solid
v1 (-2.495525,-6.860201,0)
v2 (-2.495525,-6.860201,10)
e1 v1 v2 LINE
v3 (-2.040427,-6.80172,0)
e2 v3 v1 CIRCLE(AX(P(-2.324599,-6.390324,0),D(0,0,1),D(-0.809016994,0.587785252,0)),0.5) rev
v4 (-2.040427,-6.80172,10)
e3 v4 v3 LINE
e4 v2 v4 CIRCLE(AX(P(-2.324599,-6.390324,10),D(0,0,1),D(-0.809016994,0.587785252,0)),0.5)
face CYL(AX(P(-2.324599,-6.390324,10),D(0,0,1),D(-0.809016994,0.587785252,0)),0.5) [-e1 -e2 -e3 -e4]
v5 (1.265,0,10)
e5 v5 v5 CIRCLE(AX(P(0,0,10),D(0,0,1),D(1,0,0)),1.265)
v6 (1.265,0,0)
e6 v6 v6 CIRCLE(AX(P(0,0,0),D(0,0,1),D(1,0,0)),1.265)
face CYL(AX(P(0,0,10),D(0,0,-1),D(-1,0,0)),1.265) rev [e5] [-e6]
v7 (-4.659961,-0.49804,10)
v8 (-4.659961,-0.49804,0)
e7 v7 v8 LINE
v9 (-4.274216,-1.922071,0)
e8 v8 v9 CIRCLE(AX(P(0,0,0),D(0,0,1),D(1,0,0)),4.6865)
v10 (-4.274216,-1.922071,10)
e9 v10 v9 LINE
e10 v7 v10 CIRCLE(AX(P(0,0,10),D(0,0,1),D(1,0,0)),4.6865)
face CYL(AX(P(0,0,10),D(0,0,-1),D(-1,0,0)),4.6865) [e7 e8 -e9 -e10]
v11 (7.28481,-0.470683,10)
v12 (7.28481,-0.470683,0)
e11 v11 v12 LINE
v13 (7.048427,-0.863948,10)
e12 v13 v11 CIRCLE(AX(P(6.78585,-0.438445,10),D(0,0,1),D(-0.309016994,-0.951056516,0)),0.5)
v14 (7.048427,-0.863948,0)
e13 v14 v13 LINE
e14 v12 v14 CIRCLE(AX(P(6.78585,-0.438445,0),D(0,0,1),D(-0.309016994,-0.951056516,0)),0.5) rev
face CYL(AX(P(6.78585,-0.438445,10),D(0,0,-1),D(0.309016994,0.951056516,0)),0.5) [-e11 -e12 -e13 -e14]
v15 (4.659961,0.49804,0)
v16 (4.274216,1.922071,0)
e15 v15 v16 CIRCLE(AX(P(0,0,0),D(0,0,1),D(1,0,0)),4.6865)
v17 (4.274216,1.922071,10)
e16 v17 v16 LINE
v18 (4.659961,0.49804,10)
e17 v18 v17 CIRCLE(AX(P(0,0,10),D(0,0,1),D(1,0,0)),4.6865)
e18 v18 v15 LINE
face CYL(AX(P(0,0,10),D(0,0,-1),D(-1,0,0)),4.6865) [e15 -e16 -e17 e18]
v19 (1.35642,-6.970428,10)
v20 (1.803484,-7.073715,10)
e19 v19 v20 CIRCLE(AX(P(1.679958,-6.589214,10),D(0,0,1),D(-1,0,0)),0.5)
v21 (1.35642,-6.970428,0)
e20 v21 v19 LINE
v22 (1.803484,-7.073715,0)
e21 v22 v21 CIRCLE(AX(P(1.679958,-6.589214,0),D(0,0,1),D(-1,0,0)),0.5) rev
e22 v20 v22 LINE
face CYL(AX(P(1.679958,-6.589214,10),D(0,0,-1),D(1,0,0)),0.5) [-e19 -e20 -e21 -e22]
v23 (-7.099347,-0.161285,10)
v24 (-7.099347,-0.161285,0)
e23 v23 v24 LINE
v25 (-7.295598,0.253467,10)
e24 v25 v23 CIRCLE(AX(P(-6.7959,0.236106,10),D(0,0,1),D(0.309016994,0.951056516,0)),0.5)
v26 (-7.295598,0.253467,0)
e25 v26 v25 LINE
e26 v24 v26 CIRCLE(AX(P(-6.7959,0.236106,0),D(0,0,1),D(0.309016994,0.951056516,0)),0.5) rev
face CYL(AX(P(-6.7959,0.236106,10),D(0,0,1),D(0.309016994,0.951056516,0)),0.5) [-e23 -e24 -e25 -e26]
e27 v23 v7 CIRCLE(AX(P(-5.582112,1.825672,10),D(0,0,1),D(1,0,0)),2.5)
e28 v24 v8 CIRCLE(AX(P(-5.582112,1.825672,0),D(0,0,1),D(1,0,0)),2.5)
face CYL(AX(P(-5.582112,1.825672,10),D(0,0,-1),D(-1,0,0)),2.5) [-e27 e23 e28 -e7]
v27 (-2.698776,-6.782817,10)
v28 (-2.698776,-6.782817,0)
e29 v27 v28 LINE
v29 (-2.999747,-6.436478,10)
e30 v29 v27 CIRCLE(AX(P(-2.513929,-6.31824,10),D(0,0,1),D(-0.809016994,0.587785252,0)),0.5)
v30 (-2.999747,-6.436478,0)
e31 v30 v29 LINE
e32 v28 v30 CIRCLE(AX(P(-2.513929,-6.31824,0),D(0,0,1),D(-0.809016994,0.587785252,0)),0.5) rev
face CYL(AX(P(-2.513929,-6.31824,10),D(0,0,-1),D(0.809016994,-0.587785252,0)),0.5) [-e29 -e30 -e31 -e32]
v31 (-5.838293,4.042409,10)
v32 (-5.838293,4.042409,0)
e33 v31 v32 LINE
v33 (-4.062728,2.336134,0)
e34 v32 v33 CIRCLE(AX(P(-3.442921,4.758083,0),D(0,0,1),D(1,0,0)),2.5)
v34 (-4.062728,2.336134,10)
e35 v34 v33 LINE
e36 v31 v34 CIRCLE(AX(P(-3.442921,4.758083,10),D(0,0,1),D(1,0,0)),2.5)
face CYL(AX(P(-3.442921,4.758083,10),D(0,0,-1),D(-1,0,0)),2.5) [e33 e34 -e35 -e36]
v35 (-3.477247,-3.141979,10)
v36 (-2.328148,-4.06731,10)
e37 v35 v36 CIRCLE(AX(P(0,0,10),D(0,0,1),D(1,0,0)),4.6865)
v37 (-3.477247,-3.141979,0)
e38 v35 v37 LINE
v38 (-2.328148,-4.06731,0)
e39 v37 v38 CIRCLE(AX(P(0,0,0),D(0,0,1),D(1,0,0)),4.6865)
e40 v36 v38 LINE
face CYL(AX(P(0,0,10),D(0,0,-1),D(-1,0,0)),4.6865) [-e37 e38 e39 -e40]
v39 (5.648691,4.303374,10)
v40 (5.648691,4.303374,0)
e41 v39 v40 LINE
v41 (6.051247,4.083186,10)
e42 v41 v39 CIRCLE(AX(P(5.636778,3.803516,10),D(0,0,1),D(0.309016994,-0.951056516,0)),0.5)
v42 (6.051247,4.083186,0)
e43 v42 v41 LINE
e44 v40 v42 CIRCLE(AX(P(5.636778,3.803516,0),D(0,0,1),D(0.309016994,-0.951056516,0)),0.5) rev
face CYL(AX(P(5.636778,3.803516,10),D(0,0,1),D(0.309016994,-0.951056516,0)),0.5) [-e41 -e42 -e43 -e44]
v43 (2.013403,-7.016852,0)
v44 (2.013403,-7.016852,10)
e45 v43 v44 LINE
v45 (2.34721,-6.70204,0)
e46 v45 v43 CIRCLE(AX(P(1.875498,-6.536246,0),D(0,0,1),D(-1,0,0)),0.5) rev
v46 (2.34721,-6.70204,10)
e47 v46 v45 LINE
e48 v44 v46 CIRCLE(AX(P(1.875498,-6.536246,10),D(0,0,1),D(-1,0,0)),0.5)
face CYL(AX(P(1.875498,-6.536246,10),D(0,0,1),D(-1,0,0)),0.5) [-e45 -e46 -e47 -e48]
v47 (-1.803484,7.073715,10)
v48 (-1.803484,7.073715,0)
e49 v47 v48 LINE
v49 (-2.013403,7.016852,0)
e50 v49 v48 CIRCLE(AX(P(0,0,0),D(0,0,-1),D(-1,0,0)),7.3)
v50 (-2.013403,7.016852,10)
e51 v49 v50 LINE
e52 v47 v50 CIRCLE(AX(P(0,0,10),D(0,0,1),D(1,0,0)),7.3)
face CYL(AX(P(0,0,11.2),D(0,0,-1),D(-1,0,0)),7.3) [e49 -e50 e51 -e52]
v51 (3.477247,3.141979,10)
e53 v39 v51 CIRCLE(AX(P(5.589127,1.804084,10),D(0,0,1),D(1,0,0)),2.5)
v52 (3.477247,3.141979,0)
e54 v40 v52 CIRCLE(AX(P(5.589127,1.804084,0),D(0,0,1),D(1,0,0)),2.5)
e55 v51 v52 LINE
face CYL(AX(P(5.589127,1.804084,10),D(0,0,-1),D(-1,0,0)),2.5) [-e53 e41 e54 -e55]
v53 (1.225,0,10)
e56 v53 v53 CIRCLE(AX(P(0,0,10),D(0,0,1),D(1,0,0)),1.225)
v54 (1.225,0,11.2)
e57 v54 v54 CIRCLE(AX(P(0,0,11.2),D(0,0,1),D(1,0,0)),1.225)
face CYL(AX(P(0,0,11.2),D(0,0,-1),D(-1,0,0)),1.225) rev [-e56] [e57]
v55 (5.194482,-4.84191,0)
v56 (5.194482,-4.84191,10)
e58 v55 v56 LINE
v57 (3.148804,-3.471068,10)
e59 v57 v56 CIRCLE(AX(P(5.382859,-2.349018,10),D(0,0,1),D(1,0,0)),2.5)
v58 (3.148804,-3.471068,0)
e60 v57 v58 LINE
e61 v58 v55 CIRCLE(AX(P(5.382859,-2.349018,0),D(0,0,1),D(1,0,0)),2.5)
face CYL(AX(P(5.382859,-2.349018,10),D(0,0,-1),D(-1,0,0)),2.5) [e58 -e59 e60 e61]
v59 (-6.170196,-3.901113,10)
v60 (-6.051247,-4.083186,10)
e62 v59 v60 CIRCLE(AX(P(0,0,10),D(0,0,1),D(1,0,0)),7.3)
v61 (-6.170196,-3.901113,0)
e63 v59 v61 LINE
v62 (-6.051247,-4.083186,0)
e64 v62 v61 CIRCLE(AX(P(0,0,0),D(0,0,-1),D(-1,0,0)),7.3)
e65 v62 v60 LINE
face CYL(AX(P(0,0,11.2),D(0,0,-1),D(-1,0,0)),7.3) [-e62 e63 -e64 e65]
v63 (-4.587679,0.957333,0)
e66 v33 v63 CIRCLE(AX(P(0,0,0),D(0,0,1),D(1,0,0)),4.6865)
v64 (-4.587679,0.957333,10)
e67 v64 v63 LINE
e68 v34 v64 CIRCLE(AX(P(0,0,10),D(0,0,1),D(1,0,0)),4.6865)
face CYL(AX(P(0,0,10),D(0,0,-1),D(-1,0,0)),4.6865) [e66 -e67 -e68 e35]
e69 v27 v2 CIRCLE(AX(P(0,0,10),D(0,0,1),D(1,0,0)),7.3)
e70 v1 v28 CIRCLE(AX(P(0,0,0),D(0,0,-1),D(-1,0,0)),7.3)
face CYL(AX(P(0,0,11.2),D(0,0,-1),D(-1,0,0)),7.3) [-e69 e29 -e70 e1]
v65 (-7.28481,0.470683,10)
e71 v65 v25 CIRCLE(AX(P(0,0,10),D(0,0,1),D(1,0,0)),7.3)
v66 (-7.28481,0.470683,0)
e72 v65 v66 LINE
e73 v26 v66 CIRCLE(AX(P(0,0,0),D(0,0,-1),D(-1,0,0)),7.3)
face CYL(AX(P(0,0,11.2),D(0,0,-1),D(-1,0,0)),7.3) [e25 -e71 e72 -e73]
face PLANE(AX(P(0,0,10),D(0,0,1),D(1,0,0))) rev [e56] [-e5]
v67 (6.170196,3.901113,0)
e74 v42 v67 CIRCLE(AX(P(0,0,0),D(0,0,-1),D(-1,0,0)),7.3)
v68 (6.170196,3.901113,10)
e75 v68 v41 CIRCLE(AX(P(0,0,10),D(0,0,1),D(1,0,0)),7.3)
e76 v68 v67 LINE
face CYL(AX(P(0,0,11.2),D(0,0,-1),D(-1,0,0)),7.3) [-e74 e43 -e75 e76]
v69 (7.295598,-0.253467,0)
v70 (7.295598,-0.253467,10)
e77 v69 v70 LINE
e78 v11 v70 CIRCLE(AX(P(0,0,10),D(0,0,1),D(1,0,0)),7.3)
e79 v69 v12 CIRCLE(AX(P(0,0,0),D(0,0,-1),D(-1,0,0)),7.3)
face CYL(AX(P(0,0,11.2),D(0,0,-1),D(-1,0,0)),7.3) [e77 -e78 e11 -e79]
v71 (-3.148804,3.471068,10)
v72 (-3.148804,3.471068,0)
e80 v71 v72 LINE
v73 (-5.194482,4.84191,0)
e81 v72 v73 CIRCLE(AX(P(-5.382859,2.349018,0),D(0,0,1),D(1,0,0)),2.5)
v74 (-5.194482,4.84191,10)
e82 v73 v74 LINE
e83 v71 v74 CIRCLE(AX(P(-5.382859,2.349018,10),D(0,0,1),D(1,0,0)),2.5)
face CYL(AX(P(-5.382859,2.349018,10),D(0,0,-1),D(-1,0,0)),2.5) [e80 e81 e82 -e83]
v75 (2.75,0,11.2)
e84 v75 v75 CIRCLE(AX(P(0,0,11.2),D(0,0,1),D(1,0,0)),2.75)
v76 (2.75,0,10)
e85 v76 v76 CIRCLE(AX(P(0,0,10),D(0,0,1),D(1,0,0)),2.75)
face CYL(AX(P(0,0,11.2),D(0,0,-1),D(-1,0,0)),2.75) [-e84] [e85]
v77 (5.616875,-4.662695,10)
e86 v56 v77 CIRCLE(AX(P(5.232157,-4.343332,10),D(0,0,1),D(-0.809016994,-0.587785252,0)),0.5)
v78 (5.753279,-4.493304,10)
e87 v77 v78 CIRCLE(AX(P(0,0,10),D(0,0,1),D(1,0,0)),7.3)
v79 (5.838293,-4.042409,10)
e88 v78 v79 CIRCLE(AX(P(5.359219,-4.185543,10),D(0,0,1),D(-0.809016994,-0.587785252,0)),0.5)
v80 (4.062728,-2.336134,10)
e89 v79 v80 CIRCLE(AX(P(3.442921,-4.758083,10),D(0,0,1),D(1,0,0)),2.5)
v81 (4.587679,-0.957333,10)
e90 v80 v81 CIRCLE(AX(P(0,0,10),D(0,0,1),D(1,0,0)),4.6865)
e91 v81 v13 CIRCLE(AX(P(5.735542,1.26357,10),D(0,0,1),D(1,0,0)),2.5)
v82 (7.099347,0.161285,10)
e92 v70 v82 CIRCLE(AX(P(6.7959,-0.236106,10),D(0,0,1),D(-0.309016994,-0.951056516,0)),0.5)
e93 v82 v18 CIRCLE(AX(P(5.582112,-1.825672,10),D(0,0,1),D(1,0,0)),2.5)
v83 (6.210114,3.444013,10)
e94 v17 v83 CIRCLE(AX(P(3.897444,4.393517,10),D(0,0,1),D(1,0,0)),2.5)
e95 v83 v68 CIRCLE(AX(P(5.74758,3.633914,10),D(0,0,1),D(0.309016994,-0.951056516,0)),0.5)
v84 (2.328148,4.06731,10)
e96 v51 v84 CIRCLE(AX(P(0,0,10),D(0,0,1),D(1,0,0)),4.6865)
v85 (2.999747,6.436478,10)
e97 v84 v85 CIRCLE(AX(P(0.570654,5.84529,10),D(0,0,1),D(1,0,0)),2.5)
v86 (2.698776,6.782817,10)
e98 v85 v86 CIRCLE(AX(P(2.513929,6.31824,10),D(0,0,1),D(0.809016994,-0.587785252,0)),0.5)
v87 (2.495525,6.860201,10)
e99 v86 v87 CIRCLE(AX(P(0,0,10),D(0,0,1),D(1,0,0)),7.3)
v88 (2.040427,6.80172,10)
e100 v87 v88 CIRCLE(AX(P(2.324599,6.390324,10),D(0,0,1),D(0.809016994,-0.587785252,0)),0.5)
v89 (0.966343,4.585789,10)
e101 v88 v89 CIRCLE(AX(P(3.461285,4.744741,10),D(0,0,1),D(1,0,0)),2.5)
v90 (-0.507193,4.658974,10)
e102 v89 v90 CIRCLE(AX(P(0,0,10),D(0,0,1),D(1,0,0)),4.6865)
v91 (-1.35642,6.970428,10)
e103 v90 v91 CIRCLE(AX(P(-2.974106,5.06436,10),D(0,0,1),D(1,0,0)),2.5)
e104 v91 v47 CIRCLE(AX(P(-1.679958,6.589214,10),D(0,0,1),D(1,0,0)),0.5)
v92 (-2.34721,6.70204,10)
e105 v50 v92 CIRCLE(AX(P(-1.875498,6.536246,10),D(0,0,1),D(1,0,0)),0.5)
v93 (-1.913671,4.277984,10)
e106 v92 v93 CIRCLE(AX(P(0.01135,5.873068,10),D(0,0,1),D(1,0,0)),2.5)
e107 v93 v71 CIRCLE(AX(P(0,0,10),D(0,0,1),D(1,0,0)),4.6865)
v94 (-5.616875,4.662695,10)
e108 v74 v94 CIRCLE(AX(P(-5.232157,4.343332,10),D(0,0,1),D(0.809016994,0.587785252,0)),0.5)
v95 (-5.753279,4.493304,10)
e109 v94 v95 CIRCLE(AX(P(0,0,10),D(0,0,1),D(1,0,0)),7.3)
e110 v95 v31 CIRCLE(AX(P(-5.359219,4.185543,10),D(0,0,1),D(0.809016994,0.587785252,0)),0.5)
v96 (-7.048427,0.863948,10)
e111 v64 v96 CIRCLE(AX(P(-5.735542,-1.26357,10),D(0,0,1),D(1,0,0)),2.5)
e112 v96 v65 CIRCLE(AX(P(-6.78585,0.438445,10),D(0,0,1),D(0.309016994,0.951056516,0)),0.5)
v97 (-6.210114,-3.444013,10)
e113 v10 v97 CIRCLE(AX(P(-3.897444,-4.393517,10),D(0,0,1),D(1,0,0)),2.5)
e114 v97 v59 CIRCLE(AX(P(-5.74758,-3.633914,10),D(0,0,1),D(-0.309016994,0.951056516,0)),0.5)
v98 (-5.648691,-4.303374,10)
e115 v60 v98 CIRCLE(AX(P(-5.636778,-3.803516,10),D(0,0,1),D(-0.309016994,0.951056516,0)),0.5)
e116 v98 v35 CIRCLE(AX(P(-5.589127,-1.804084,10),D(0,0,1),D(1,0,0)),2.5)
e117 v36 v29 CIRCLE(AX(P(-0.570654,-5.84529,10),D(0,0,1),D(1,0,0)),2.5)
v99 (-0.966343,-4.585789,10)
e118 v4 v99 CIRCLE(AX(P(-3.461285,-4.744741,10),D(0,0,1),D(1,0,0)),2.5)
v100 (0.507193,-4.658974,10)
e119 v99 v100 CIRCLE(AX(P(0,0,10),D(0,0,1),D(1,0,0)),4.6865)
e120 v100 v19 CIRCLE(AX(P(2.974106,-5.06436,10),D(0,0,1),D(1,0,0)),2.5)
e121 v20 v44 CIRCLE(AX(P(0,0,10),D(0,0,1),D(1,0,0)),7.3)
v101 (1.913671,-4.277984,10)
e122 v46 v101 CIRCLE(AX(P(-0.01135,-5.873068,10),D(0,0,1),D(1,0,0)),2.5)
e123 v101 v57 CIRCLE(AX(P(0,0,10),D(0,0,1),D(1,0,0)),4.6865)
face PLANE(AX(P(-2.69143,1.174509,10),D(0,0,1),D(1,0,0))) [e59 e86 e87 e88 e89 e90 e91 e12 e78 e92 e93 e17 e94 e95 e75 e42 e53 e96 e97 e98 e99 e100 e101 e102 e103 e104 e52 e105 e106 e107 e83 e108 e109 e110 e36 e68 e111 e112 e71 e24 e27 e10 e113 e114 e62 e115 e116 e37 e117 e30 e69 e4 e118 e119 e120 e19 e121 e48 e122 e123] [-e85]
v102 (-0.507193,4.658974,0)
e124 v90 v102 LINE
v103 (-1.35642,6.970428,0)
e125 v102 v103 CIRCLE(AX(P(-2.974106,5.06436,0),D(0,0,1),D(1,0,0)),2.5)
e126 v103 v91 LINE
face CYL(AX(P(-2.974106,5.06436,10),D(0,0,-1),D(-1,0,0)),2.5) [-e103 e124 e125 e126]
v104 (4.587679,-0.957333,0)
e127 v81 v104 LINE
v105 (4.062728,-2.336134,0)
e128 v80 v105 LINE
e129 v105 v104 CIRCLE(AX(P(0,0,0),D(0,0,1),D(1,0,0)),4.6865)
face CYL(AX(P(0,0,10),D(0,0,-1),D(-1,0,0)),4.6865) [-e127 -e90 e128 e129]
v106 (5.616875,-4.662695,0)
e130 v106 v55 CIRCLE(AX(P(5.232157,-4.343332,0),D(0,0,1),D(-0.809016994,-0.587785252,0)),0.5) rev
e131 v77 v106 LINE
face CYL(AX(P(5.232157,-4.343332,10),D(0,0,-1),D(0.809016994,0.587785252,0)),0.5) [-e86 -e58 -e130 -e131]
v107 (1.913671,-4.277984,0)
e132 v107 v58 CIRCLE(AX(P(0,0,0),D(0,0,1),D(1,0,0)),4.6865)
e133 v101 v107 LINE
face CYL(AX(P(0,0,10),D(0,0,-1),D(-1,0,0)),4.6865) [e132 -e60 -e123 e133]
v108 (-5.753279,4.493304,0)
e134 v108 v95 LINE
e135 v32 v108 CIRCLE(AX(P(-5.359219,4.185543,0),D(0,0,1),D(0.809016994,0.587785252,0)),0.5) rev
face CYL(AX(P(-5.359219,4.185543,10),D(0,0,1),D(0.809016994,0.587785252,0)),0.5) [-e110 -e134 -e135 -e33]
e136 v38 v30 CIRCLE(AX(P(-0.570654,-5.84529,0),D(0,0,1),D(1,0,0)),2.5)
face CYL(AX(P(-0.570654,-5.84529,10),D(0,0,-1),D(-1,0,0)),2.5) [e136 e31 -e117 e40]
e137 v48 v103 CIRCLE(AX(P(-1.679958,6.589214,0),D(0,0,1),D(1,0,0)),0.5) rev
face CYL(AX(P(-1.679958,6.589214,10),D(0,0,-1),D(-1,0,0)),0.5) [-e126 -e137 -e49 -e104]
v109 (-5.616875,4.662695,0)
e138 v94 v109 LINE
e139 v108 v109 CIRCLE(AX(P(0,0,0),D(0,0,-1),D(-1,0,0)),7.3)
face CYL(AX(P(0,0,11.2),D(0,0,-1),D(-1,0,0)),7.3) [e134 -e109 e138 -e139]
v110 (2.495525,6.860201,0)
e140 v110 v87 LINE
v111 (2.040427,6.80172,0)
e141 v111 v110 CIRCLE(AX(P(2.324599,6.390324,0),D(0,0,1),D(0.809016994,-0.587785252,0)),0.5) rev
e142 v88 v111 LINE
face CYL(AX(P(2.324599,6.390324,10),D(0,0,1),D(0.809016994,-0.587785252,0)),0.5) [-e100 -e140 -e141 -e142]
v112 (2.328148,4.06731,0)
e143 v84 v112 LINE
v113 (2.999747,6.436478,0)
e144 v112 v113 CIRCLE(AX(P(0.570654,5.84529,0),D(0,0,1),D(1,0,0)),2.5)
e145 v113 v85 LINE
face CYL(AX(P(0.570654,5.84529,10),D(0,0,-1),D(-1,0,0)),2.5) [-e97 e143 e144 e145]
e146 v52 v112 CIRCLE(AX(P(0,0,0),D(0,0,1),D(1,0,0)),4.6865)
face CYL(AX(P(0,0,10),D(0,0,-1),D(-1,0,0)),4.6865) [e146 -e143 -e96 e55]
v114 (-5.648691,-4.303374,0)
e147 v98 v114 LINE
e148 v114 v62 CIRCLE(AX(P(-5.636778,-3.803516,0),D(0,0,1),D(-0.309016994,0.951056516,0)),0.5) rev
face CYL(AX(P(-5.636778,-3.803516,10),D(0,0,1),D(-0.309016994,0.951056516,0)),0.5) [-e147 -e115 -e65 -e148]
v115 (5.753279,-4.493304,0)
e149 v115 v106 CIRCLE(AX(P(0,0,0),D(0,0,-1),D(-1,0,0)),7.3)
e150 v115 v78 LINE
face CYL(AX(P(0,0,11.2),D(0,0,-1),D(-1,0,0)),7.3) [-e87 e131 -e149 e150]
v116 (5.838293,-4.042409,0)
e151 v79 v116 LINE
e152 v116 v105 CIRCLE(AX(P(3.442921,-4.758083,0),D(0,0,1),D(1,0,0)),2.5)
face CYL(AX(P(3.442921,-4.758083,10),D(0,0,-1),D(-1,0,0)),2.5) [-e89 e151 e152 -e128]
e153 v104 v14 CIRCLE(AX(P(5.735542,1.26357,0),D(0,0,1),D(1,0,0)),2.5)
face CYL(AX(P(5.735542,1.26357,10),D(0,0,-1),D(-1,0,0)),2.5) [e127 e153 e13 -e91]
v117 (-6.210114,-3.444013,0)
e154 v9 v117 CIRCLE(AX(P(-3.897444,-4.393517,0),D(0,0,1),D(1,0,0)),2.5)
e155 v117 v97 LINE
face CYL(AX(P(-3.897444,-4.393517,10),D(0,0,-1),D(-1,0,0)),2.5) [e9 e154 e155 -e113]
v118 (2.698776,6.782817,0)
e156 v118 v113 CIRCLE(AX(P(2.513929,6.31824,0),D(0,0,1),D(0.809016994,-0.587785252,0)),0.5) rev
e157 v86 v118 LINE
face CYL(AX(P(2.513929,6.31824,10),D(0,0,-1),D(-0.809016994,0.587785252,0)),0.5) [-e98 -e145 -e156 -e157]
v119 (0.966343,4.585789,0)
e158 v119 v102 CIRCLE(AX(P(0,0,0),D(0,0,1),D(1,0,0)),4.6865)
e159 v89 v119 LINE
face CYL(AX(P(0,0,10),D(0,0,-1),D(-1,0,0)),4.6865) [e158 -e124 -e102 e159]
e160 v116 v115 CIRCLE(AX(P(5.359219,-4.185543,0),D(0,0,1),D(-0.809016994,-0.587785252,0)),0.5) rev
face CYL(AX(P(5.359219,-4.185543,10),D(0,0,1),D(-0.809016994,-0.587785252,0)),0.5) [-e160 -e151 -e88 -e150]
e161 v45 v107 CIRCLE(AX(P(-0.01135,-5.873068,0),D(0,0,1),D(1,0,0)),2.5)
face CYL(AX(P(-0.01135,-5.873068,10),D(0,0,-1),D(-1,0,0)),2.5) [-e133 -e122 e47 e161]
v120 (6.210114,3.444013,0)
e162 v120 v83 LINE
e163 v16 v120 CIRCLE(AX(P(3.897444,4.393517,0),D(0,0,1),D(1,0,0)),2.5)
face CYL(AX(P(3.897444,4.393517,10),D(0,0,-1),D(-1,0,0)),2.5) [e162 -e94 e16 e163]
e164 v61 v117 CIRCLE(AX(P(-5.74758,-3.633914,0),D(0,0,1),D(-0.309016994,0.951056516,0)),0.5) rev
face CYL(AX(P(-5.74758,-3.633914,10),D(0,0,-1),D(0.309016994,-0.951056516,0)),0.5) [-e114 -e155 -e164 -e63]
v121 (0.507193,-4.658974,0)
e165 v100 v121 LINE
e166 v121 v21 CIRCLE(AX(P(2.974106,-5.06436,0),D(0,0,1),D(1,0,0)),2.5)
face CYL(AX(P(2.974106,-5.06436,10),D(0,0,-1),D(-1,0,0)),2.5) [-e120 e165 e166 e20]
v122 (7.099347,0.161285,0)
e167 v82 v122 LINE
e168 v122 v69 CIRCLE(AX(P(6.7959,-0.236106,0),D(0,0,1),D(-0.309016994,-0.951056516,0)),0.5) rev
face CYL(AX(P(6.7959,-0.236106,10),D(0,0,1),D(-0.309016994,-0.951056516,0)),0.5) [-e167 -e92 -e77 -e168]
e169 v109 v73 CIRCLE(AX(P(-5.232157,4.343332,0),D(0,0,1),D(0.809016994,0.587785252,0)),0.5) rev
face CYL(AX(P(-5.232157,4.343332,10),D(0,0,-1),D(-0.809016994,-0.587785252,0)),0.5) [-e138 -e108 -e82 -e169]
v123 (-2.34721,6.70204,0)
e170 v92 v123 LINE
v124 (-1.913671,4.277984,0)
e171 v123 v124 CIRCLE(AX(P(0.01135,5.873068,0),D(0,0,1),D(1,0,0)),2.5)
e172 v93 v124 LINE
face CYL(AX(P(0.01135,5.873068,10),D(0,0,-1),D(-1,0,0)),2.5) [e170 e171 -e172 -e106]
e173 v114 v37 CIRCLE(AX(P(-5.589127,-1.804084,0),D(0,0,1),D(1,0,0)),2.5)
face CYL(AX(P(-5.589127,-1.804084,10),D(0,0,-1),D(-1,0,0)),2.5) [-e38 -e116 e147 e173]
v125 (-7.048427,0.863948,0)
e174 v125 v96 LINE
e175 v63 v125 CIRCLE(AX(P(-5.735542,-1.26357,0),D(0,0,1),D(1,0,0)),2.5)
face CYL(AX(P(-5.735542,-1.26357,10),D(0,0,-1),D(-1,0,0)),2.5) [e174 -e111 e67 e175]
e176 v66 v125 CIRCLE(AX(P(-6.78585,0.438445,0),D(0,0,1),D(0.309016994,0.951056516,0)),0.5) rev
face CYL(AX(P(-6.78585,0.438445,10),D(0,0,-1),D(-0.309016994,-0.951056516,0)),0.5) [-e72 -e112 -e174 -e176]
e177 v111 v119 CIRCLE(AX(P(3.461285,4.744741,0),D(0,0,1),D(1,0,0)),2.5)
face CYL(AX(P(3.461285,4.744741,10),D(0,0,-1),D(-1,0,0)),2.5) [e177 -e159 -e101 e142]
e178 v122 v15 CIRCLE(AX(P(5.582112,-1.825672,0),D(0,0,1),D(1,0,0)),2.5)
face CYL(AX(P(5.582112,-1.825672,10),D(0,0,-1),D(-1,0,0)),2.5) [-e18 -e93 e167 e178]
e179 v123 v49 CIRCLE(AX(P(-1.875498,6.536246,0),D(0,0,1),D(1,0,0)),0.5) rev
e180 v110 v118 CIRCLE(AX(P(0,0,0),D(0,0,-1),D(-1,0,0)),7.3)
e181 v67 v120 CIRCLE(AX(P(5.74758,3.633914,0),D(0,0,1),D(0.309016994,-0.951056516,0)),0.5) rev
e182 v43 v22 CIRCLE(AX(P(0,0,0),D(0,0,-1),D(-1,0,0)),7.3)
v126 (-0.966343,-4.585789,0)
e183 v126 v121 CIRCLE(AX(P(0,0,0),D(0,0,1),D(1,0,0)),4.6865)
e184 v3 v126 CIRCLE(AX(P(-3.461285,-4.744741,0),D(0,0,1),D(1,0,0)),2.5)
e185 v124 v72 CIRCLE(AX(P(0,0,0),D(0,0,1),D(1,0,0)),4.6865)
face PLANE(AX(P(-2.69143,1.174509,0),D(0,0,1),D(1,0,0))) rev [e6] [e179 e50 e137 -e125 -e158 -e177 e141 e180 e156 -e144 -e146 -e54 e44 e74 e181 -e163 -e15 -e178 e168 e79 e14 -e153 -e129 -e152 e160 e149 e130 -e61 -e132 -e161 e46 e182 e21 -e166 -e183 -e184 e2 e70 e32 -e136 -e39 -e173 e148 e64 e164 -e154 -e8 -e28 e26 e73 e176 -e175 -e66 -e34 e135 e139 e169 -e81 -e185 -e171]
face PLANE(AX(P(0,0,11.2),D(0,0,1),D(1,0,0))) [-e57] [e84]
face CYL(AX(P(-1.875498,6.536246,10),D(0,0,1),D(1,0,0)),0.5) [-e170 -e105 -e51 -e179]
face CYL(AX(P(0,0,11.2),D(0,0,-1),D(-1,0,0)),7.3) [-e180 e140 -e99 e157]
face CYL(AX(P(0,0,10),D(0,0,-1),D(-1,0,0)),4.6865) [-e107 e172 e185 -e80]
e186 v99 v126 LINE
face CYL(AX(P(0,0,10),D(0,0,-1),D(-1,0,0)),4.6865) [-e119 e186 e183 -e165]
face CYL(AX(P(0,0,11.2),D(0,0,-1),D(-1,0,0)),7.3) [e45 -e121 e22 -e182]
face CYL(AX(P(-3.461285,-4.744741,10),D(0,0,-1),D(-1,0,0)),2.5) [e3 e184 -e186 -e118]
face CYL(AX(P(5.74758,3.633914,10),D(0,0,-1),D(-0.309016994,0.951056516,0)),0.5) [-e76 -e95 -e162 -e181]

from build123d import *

# Parameters (mm, degrees)
SKETCH_1_R               = 1.265
EXTRUDE_1_DEPTH          = 10
SKETCH_2_R               = 2.75
SKETCH_2_R_2             = 1.225
EXTRUDE_2_DEPTH          = 1.2
SKETCH_3_R               = 10.210079725
SKETCH_3_R_2             = 7.3
CUT_EXTRUDE_2_DEPTH      = 16.316956182
FILLET_1_R               = 0.5
PATTERN_CIRCULAR_2_DEPTH = 10


# Read off the part's stored shape, not the designer's step: Круговой массив2
with BuildPart() as part:
    # Эскиз1 → Бобышка-Вытянуть1 (new body)
    with BuildSketch(Plane.XY):
        with BuildLine():
            ThreePointArc((-3.148803906, 3.471068454), (-4.227852242, 4.566214035), (-5.743712894, 4.822837566))
            ThreePointArc((-5.743712894, 4.822837566), (-5.841480421, 4.703945843), (-5.936787387, 4.583072716))
            ThreePointArc((-5.936787387, 4.583072716), (-5.362797198, 3.156810321), (-4.062728379, 2.336133637))
            ThreePointArc((-4.062728379, 2.336133637), (-4.379801209, 1.667520202), (-4.587678719, 0.95733287))
            ThreePointArc((-4.587678719, 0.95733287), (-6.104357582, 1.209075557), (-7.481554138, 0.525687819))
            ThreePointArc((-7.481554138, 0.525687819), (-7.490766927, 0.372036085), (-7.496824441, 0.218227641))
            ThreePointArc((-7.496824441, 0.218227641), (-6.194120622, -0.598259906), (-4.659961201, -0.498040012))
            ThreePointArc((-4.659961201, -0.498040012), (-4.523477392, -1.225330377), (-4.274216191, -1.922071332))
            ThreePointArc((-4.274216191, -1.922071332), (-5.649205805, -2.609888688), (-6.361695989, -3.972256807))
            ThreePointArc((-6.361695989, -3.972256807), (-6.278835069, -4.101978813), (-6.193329365, -4.229972975))
            ThreePointArc((-6.193329365, -4.229972975), (-4.659500498, -4.124815183), (-3.477247231, -3.141979304))
            ThreePointArc((-3.477247231, -3.141979304), (-2.939338959, -3.650146399), (-2.328148353, -4.067309614))
            ThreePointArc((-2.328148353, -4.067309614), (-3.03624942, -5.431964161), (-2.811886199, -6.952934345))
            ThreePointArc((-2.811886199, -6.952934345), (-2.668601624, -7.009177225), (-2.524192976, -7.062467686))
            ThreePointArc((-2.524192976, -7.062467686), (-1.345109555, -6.075831258), (-0.966343005, -4.585789294))
            ThreePointArc((-0.966343005, -4.585789294), (-0.232472948, -4.68073056), (0.507193024, -4.658973866))
            ThreePointArc((0.507193024, -4.658973866), (0.736451045, -6.179213951), (1.811968547, -7.277827285))
            ThreePointArc((1.811968547, -7.277827285), (1.960946938, -7.239108171), (2.109099336, -7.197339786))
            ThreePointArc((2.109099336, -7.197339786), (2.483067519, -5.706086302), (1.913671403, -4.277983638))
            ThreePointArc((1.913671403, -4.277983638), (2.563189827, -3.92343474), (3.148803906, -3.471068454))
            ThreePointArc((3.148803906, -3.471068454), (4.227852242, -4.566214035), (5.743712894, -4.822837566))
            ThreePointArc((5.743712894, -4.822837566), (5.841480421, -4.703945843), (5.936787387, -4.583072716))
            ThreePointArc((5.936787387, -4.583072716), (5.362797198, -3.156810321), (4.062728379, -2.336133637))
            ThreePointArc((4.062728379, -2.336133637), (4.379801209, -1.667520202), (4.587678719, -0.95733287))
            ThreePointArc((4.587678719, -0.95733287), (6.104357582, -1.209075557), (7.481554138, -0.525687819))
            ThreePointArc((7.481554138, -0.525687819), (7.490766927, -0.372036085), (7.496824441, -0.218227641))
            ThreePointArc((7.496824441, -0.218227641), (6.194120622, 0.598259906), (4.659961201, 0.498040012))
            ThreePointArc((4.659961201, 0.498040012), (4.523477392, 1.225330377), (4.274216191, 1.922071332))
            ThreePointArc((4.274216191, 1.922071332), (5.649205805, 2.609888688), (6.361695989, 3.972256807))
            ThreePointArc((6.361695989, 3.972256807), (6.278835069, 4.101978813), (6.193329365, 4.229972975))
            ThreePointArc((6.193329365, 4.229972975), (4.659500498, 4.124815183), (3.477247231, 3.141979304))
            ThreePointArc((3.477247231, 3.141979304), (2.939338959, 3.650146399), (2.328148353, 4.067309614))
            ThreePointArc((2.328148353, 4.067309614), (3.03624942, 5.431964161), (2.811886199, 6.952934345))
            ThreePointArc((2.811886199, 6.952934345), (2.668601624, 7.009177225), (2.524192976, 7.062467686))
            ThreePointArc((2.524192976, 7.062467686), (1.345109555, 6.075831258), (0.966343005, 4.585789294))
            ThreePointArc((0.966343005, 4.585789294), (0.232472948, 4.68073056), (-0.507193024, 4.658973866))
            ThreePointArc((-0.507193024, 4.658973866), (-0.736451045, 6.179213951), (-1.811968547, 7.277827285))
            ThreePointArc((-1.811968547, 7.277827285), (-1.960946938, 7.239108171), (-2.109099336, 7.197339786))
            ThreePointArc((-2.109099336, 7.197339786), (-2.483067519, 5.706086302), (-1.913671403, 4.277983638))
            ThreePointArc((-1.913671403, 4.277983638), (-2.563189827, 3.92343474), (-3.148803906, 3.471068454))
        make_face()
        Circle(SKETCH_1_R, mode=Mode.SUBTRACT)
    extrude(amount=EXTRUDE_1_DEPTH)

    # Эскиз2 → Бобышка-Вытянуть2 (add)
    with BuildSketch(Plane.XY.offset(10)):
        Circle(SKETCH_2_R)
        Circle(SKETCH_2_R_2, mode=Mode.SUBTRACT)
    extrude(amount=EXTRUDE_2_DEPTH)

    # Эскиз3 → Вырез-Вытянуть2 (cut, through all)
    with BuildSketch(Plane(origin=(0, 0, 0), x_dir=(-1, 0, 0), z_dir=(0, 0, -1))):
        Circle(SKETCH_3_R)
        Circle(SKETCH_3_R_2, mode=Mode.SUBTRACT)
    extrude(amount=-CUT_EXTRUDE_2_DEPTH, mode=Mode.SUBTRACT)

    # Скругление1
    fillet_1_edges = [part.edges().sort_by_distance(p)[0] for p in [
        (-2.246892365, 6.945608303, 5),
        (-1.565958675, 7.13006125, 5),
    ]]
    fillet(fillet_1_edges, radius=FILLET_1_R)

    # Круговой массив2 outline → Круговой массив2 (cut)
    with BuildSketch(Plane.XY):
        with BuildLine():
            ThreePointArc((-5.838293306, 4.042408612), (-5.850561559, 4.278183981), (-5.753278974, 4.493304024))
            ThreePointArc((-5.753278974, 4.493304024), (-5.827604273, 4.396479095), (-5.900300237, 4.298424958))
            ThreePointArc((-5.900300237, 4.298424958), (-5.872671085, 4.169599529), (-5.838293306, 4.042408612))
        make_face()
        with BuildLine():
            ThreePointArc((-5.457832031, 4.847893307), (-5.538127486, 4.755958783), (-5.61687454, 4.662694543))
            ThreePointArc((-5.61687454, 4.662694543), (-5.427449488, 4.803615386), (-5.19448163, 4.841910441))
            ThreePointArc((-5.19448163, 4.841910441), (-5.326077976, 4.84837285), (-5.457832031, 4.847893307))
        make_face()
        with BuildLine():
            ThreePointArc((-7.099346669, -0.161285439), (-7.247857179, 0.022249743), (-7.295598302, 0.253466783))
            ThreePointArc((-7.295598302, 0.253466783), (-7.298816468, 0.131446456), (-7.299993962, 0.009389377))
            ThreePointArc((-7.299993962, 0.009389377), (-7.201919821, -0.078592576), (-7.099346669, -0.161285439))
        make_face()
        with BuildLine():
            ThreePointArc((-7.264999056, 0.713994895), (-7.275921686, 0.592421818), (-7.284810046, 0.470683106))
            ThreePointArc((-7.284810046, 0.470683106), (-7.214393154, 0.696031715), (-7.048427465, 0.863948137))
            ThreePointArc((-7.048427465, 0.863948137), (-7.158689654, 0.791825944), (-7.264999056, 0.713994895))
        make_face()
        with BuildLine():
            ThreePointArc((-5.648690902, -4.303373934), (-5.876717701, -4.24218314), (-6.051247048, -4.083186154))
            ThreePointArc((-6.051247048, -4.083186154), (-5.982128849, -4.183794263), (-5.911338111, -4.283232627))
            ThreePointArc((-5.911338111, -4.283232627), (-5.78027997, -4.296764989), (-5.648690902, -4.303373934))
        make_face()
        with BuildLine():
            ThreePointArc((-6.29718337, -3.692625299), (-6.234561102, -3.797400146), (-6.170195716, -3.90111328))
            ThreePointArc((-6.170195716, -3.90111328), (-6.245683843, -3.677412414), (-6.210113576, -3.444012991))
            ThreePointArc((-6.210113576, -3.444012991), (-6.2569252, -3.567171559), (-6.29718337, -3.692625299))
        make_face()
        with BuildLine():
            ThreePointArc((-2.040427202, -6.801719852), (-2.260871804, -6.88624625), (-2.495525095, -6.860200762))
            ThreePointArc((-2.495525095, -6.860200762), (-2.380471335, -6.900967774), (-2.264752021, -6.939805349))
            ThreePointArc((-2.264752021, -6.939805349), (-2.150769635, -6.873719217), (-2.040427202, -6.801719852))
        make_face()
        with BuildLine():
            ThreePointArc((-2.92405767, -6.688788137), (-2.811810081, -6.736744322), (-2.69877634, -6.782816986))
            ThreePointArc((-2.69877634, -6.782816986), (-2.891335587, -6.646209992), (-2.999747375, -6.436478214))
            ThreePointArc((-2.999747375, -6.436478214), (-2.965227985, -6.563630771), (-2.92405767, -6.688788137))
        make_face()
        with BuildLine():
            ThreePointArc((2.347210337, -6.702039969), (2.218550278, -6.899997348), (2.013402624, -7.016851849))
            ThreePointArc((2.013402624, -7.016851849), (2.130445319, -6.982206151), (2.246892365, -6.945608303))
            ThreePointArc((2.246892365, -6.945608303), (2.300261598, -6.825146334), (2.347210337, -6.702039969))
        make_face()
        with BuildLine():
            ThreePointArc((1.565958675, -7.13006125), (1.684956821, -7.102881142), (1.80348387, -7.073715143))
            ThreePointArc((1.80348387, -7.073715143), (1.56740459, -7.076381249), (1.356420365, -6.970427527))
            ThreePointArc((1.356420365, -6.970427527), (1.459085537, -7.053006118), (1.565958675, -7.13006125))
        make_face()
        with BuildLine():
            ThreePointArc((5.838293306, -4.042408612), (5.850561559, -4.278183981), (5.753278974, -4.493304024))
            ThreePointArc((5.753278974, -4.493304024), (5.827604273, -4.396479095), (5.900300237, -4.298424958))
            ThreePointArc((5.900300237, -4.298424958), (5.872671085, -4.169599529), (5.838293306, -4.042408612))
        make_face()
        with BuildLine():
            ThreePointArc((5.457832031, -4.847893307), (5.538127486, -4.755958783), (5.61687454, -4.662694543))
            ThreePointArc((5.61687454, -4.662694543), (5.427449488, -4.803615386), (5.19448163, -4.841910441))
            ThreePointArc((5.19448163, -4.841910441), (5.326077976, -4.84837285), (5.457832031, -4.847893307))
        make_face()
        with BuildLine():
            ThreePointArc((7.099346669, 0.161285439), (7.247857179, -0.022249743), (7.295598302, -0.253466783))
            ThreePointArc((7.295598302, -0.253466783), (7.298816468, -0.131446456), (7.299993962, -0.009389377))
            ThreePointArc((7.299993962, -0.009389377), (7.201919821, 0.078592576), (7.099346669, 0.161285439))
        make_face()
        with BuildLine():
            ThreePointArc((7.264999056, -0.713994895), (7.275921686, -0.592421818), (7.284810046, -0.470683106))
            ThreePointArc((7.284810046, -0.470683106), (7.214393154, -0.696031715), (7.048427465, -0.863948137))
            ThreePointArc((7.048427465, -0.863948137), (7.158689654, -0.791825944), (7.264999056, -0.713994895))
        make_face()
        with BuildLine():
            ThreePointArc((5.648690902, 4.303373934), (5.876717701, 4.24218314), (6.051247048, 4.083186154))
            ThreePointArc((6.051247048, 4.083186154), (5.982128849, 4.183794263), (5.911338111, 4.283232627))
            ThreePointArc((5.911338111, 4.283232627), (5.78027997, 4.296764989), (5.648690902, 4.303373934))
        make_face()
        with BuildLine():
            ThreePointArc((6.29718337, 3.692625299), (6.234561102, 3.797400146), (6.170195716, 3.90111328))
            ThreePointArc((6.170195716, 3.90111328), (6.245683843, 3.677412414), (6.210113576, 3.444012991))
            ThreePointArc((6.210113576, 3.444012991), (6.2569252, 3.567171559), (6.29718337, 3.692625299))
        make_face()
        with BuildLine():
            ThreePointArc((2.040427202, 6.801719852), (2.260871804, 6.88624625), (2.495525095, 6.860200762))
            ThreePointArc((2.495525095, 6.860200762), (2.380471335, 6.900967774), (2.264752021, 6.939805349))
            ThreePointArc((2.264752021, 6.939805349), (2.150769635, 6.873719217), (2.040427202, 6.801719852))
        make_face()
        with BuildLine():
            ThreePointArc((2.92405767, 6.688788137), (2.811810081, 6.736744322), (2.69877634, 6.782816986))
            ThreePointArc((2.69877634, 6.782816986), (2.891335587, 6.646209992), (2.999747375, 6.436478214))
            ThreePointArc((2.999747375, 6.436478214), (2.965227985, 6.563630771), (2.92405767, 6.688788137))
        make_face()
    extrude(amount=PATTERN_CIRCULAR_2_DEPTH, mode=Mode.SUBTRACT)


solid = part.part
